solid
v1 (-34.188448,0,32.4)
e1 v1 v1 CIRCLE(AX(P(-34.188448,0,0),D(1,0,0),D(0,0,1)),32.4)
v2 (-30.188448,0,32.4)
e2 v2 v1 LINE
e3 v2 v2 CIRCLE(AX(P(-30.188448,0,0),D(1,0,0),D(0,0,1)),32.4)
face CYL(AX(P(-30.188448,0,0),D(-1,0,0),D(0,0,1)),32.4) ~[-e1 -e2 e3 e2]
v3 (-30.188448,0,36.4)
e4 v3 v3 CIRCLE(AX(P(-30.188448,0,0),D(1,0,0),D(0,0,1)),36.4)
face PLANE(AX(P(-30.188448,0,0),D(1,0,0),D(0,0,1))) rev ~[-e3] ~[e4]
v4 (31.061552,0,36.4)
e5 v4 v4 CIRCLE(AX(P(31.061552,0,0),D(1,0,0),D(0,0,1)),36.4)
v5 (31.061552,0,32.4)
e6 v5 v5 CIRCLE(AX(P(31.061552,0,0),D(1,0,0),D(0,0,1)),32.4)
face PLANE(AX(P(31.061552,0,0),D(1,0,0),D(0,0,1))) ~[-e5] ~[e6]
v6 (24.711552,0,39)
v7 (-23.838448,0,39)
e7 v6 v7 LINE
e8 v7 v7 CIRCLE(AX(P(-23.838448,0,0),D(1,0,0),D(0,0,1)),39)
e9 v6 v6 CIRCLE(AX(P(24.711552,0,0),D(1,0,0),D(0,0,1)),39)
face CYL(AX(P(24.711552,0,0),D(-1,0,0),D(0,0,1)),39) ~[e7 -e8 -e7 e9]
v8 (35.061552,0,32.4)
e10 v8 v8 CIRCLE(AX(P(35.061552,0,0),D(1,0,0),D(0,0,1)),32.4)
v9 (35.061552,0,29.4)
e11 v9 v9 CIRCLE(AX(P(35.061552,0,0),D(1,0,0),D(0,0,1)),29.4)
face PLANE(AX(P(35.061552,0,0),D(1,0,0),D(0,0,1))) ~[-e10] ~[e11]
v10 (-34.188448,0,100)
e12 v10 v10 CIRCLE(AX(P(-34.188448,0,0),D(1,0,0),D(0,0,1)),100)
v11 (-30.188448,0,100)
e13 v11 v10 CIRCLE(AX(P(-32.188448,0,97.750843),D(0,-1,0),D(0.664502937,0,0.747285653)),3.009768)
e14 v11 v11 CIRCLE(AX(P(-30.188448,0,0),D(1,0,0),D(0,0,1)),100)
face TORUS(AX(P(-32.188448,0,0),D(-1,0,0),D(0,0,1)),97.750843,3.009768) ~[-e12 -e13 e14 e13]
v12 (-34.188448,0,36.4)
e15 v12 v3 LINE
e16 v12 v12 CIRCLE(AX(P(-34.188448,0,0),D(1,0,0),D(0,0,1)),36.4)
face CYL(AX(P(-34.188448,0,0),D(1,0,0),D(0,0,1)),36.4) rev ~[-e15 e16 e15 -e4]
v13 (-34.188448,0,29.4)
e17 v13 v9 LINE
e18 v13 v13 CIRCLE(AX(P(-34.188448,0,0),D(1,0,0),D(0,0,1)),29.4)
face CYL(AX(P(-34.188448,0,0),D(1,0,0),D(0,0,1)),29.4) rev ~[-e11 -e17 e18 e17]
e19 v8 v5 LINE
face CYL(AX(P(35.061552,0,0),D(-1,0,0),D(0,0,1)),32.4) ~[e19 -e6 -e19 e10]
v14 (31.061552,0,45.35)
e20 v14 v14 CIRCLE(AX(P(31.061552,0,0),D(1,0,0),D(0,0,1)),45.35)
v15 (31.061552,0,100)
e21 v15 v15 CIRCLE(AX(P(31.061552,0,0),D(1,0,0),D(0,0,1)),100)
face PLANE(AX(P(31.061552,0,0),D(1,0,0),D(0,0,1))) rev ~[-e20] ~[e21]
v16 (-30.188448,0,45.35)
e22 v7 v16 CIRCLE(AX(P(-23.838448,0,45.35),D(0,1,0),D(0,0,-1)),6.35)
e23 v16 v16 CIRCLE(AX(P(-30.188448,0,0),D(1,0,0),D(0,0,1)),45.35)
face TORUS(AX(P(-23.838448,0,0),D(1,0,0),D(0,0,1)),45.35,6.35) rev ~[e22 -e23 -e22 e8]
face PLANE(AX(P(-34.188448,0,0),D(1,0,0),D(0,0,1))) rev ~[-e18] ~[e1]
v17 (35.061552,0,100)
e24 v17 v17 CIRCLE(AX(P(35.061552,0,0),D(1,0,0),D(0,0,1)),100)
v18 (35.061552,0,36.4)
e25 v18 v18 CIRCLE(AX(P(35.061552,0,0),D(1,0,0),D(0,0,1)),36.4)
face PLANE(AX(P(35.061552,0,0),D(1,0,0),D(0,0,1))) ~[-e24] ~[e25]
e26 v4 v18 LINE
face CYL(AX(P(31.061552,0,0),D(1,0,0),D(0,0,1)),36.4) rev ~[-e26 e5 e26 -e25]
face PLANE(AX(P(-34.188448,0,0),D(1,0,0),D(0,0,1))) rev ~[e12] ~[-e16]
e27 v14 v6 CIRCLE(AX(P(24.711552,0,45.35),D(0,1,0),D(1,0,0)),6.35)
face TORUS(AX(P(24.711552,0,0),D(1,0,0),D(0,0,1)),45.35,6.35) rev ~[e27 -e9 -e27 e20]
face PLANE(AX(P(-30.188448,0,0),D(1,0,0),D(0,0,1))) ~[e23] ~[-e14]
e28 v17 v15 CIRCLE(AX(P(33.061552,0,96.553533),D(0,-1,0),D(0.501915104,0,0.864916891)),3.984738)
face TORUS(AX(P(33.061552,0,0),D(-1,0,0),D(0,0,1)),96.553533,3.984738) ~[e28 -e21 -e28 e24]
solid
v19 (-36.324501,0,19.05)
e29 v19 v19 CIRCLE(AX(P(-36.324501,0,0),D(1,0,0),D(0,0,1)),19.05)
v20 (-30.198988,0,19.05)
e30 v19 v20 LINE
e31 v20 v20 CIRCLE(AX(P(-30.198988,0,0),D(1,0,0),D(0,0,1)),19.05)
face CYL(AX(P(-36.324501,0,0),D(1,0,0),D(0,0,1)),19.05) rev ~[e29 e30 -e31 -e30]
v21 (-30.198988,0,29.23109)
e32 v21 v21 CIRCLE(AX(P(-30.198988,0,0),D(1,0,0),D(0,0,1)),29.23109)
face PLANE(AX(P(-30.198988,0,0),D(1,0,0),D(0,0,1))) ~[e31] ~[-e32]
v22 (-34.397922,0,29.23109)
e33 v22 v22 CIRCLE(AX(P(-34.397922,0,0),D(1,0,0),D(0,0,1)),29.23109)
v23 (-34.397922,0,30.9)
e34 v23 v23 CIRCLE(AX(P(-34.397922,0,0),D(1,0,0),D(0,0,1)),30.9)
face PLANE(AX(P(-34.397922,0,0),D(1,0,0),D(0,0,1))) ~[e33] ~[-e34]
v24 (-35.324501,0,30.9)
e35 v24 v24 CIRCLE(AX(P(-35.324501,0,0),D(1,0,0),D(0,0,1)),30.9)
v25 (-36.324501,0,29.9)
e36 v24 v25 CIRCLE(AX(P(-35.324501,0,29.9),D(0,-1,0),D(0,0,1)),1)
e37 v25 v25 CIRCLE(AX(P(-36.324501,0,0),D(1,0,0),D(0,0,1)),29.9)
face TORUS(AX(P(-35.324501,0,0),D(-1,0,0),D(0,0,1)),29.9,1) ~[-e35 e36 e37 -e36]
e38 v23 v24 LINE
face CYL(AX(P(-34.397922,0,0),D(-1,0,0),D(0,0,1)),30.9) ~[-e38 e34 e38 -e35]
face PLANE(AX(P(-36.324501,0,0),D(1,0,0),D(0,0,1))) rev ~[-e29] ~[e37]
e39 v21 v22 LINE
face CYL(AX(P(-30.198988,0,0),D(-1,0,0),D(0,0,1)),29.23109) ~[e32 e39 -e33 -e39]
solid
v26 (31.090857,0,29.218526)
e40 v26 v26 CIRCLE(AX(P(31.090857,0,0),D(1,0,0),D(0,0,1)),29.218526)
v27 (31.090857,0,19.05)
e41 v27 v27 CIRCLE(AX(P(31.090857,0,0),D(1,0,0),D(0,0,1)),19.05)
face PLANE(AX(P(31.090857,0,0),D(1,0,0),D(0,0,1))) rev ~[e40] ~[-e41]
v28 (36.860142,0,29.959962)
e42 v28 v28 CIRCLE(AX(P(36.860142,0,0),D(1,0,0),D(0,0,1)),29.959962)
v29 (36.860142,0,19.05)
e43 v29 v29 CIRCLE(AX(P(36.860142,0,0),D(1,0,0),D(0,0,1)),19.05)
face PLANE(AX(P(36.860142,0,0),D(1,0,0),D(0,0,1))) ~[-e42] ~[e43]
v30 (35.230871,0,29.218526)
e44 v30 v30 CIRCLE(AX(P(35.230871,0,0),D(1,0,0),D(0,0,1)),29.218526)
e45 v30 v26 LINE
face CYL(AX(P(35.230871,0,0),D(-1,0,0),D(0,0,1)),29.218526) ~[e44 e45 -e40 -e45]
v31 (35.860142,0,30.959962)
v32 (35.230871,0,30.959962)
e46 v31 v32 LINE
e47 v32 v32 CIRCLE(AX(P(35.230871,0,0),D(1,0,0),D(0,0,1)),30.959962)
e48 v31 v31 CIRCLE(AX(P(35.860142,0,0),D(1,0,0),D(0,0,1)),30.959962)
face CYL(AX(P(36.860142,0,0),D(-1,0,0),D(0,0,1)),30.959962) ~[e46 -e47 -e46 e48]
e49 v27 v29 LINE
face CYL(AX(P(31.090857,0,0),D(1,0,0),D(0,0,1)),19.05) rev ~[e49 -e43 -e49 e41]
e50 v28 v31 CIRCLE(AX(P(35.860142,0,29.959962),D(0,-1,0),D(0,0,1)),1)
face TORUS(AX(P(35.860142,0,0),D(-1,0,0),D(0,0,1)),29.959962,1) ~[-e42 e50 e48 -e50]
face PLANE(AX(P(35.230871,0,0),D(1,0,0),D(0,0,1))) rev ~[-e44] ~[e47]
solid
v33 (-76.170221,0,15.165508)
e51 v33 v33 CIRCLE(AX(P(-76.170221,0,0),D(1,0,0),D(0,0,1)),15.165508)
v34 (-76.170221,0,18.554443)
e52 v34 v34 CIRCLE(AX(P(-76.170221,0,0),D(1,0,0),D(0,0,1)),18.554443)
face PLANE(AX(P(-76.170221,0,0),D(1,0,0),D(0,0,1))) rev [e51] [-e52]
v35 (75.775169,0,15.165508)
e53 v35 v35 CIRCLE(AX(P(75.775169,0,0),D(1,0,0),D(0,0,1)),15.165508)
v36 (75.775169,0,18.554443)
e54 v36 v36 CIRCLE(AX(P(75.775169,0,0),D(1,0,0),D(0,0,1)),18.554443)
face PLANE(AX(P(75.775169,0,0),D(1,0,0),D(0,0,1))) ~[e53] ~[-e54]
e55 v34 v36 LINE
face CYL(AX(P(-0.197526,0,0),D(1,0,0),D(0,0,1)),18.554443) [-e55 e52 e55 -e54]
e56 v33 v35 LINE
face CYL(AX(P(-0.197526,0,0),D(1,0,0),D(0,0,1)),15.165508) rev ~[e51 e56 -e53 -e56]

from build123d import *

# Parameters (mm, degrees)
F0_W   = 151.9453898072
F0_H   = 3.3889357001
F2_R   = 1
F2_2_R = 1


# Not quite as in the source:
# - a feature names something its author has since deleted; it is built from what else it names


with BuildPart() as f1:
    # F0 (on Front) → F1 (revolve)
    with BuildSketch(Plane.XZ):
        with BuildLine():
            Line((-34.1884475201, 29.4), (-0.0061754836, 29.4))
            Line((-0.0061754836, 29.4), (35.0615524799, 29.4))
            Line((35.0615524799, 29.4), (35.0615524799, 32.4))
            Line((35.0615524799, 32.4), (31.0615524799, 32.4))
            Line((31.0615524799, 32.4), (31.0615524799, 36.4))
            Line((31.0615524799, 36.4), (35.0615524799, 36.4))
            Line((35.0615524799, 36.4), (35.0615524799, 100))
            ThreePointArc((35.0615524799, 100), (33.0615524799, 100.5382707476), (31.0615524799, 100))
            Line((31.0615524799, 100), (31.0615524799, 45.35))
            ThreePointArc((31.0615524799, 45.35), (29.2016805404, 40.8598719395), (24.7115524799, 39))
            Line((24.7115524799, 39), (-23.8384475201, 39))
            ThreePointArc((-23.8384475201, 39), (-28.3285755807, 40.8598719395), (-30.1884475201, 45.35))
            Line((-30.1884475201, 45.35), (-30.1884475201, 100))
            ThreePointArc((-30.1884475201, 100), (-32.1884475201, 100.7606116789), (-34.1884475201, 100))
            Line((-34.1884475201, 100), (-34.1884475201, 36.4))
            Line((-34.1884475201, 36.4), (-30.1884475201, 36.4))
            Line((-30.1884475201, 36.4), (-30.1884475201, 32.4))
            Line((-30.1884475201, 32.4), (-34.1884475201, 32.4))
            Line((-34.1884475201, 32.4), (-34.1884475201, 29.4))
        make_face()
    revolve(axis=Axis((0.6704887888, 0, 0), (1, 0, 0)))


with BuildPart() as f1b:
    # F0 (on Front) → F1, piece 2 (revolve)
    with BuildSketch(Plane.XZ):
        Polygon((-36.3245010376, 19.05), (-30.1989875734, 19.05), (-30.1989875734, 29.2310900986), (-34.3979224563, 29.2310900986), (-34.3979224563, 30.9), (-36.3245010376, 30.9), align=None)
    revolve(axis=Axis((0.6704887888, 0, 0), (1, 0, 0)))

    # F2#2
    f2_2_edges = [f1b.edges().sort_by_distance(p)[0] for p in [
        (-36.324501, 0, -30.9),
    ]]
    fillet(f2_2_edges, radius=F2_2_R)


with BuildPart() as f1c:
    # F0 (on Front) → F1, piece 3 (revolve)
    with BuildSketch(Plane.XZ):
        Polygon((31.0908566462, 29.2185264379), (31.0908566462, 19.05), (36.8601419032, 19.05), (36.8601419032, 30.9599618167), (35.23087129, 30.9599618167), (35.23087129, 29.2185264379), align=None)
    revolve(axis=Axis((0.6704887888, 0, 0), (1, 0, 0)))

    # F2
    f2_edges = [f1c.edges().sort_by_distance(p)[0] for p in [
        (36.860142, 0, -30.959962),
    ]]
    fillet(f2_edges, radius=F2_R)


with BuildPart() as f1d:
    # F0 (on Front) → F1, piece 4 (revolve)
    with BuildSketch(Plane.XZ):
        with Locations((-0.1975260675, 16.8599756435)):
            Rectangle(F0_W, F0_H)
    revolve(axis=Axis((0.6704887888, 0, 0), (1, 0, 0)))


solid = Compound([f1.part, f1b.part, f1c.part, f1d.part])
